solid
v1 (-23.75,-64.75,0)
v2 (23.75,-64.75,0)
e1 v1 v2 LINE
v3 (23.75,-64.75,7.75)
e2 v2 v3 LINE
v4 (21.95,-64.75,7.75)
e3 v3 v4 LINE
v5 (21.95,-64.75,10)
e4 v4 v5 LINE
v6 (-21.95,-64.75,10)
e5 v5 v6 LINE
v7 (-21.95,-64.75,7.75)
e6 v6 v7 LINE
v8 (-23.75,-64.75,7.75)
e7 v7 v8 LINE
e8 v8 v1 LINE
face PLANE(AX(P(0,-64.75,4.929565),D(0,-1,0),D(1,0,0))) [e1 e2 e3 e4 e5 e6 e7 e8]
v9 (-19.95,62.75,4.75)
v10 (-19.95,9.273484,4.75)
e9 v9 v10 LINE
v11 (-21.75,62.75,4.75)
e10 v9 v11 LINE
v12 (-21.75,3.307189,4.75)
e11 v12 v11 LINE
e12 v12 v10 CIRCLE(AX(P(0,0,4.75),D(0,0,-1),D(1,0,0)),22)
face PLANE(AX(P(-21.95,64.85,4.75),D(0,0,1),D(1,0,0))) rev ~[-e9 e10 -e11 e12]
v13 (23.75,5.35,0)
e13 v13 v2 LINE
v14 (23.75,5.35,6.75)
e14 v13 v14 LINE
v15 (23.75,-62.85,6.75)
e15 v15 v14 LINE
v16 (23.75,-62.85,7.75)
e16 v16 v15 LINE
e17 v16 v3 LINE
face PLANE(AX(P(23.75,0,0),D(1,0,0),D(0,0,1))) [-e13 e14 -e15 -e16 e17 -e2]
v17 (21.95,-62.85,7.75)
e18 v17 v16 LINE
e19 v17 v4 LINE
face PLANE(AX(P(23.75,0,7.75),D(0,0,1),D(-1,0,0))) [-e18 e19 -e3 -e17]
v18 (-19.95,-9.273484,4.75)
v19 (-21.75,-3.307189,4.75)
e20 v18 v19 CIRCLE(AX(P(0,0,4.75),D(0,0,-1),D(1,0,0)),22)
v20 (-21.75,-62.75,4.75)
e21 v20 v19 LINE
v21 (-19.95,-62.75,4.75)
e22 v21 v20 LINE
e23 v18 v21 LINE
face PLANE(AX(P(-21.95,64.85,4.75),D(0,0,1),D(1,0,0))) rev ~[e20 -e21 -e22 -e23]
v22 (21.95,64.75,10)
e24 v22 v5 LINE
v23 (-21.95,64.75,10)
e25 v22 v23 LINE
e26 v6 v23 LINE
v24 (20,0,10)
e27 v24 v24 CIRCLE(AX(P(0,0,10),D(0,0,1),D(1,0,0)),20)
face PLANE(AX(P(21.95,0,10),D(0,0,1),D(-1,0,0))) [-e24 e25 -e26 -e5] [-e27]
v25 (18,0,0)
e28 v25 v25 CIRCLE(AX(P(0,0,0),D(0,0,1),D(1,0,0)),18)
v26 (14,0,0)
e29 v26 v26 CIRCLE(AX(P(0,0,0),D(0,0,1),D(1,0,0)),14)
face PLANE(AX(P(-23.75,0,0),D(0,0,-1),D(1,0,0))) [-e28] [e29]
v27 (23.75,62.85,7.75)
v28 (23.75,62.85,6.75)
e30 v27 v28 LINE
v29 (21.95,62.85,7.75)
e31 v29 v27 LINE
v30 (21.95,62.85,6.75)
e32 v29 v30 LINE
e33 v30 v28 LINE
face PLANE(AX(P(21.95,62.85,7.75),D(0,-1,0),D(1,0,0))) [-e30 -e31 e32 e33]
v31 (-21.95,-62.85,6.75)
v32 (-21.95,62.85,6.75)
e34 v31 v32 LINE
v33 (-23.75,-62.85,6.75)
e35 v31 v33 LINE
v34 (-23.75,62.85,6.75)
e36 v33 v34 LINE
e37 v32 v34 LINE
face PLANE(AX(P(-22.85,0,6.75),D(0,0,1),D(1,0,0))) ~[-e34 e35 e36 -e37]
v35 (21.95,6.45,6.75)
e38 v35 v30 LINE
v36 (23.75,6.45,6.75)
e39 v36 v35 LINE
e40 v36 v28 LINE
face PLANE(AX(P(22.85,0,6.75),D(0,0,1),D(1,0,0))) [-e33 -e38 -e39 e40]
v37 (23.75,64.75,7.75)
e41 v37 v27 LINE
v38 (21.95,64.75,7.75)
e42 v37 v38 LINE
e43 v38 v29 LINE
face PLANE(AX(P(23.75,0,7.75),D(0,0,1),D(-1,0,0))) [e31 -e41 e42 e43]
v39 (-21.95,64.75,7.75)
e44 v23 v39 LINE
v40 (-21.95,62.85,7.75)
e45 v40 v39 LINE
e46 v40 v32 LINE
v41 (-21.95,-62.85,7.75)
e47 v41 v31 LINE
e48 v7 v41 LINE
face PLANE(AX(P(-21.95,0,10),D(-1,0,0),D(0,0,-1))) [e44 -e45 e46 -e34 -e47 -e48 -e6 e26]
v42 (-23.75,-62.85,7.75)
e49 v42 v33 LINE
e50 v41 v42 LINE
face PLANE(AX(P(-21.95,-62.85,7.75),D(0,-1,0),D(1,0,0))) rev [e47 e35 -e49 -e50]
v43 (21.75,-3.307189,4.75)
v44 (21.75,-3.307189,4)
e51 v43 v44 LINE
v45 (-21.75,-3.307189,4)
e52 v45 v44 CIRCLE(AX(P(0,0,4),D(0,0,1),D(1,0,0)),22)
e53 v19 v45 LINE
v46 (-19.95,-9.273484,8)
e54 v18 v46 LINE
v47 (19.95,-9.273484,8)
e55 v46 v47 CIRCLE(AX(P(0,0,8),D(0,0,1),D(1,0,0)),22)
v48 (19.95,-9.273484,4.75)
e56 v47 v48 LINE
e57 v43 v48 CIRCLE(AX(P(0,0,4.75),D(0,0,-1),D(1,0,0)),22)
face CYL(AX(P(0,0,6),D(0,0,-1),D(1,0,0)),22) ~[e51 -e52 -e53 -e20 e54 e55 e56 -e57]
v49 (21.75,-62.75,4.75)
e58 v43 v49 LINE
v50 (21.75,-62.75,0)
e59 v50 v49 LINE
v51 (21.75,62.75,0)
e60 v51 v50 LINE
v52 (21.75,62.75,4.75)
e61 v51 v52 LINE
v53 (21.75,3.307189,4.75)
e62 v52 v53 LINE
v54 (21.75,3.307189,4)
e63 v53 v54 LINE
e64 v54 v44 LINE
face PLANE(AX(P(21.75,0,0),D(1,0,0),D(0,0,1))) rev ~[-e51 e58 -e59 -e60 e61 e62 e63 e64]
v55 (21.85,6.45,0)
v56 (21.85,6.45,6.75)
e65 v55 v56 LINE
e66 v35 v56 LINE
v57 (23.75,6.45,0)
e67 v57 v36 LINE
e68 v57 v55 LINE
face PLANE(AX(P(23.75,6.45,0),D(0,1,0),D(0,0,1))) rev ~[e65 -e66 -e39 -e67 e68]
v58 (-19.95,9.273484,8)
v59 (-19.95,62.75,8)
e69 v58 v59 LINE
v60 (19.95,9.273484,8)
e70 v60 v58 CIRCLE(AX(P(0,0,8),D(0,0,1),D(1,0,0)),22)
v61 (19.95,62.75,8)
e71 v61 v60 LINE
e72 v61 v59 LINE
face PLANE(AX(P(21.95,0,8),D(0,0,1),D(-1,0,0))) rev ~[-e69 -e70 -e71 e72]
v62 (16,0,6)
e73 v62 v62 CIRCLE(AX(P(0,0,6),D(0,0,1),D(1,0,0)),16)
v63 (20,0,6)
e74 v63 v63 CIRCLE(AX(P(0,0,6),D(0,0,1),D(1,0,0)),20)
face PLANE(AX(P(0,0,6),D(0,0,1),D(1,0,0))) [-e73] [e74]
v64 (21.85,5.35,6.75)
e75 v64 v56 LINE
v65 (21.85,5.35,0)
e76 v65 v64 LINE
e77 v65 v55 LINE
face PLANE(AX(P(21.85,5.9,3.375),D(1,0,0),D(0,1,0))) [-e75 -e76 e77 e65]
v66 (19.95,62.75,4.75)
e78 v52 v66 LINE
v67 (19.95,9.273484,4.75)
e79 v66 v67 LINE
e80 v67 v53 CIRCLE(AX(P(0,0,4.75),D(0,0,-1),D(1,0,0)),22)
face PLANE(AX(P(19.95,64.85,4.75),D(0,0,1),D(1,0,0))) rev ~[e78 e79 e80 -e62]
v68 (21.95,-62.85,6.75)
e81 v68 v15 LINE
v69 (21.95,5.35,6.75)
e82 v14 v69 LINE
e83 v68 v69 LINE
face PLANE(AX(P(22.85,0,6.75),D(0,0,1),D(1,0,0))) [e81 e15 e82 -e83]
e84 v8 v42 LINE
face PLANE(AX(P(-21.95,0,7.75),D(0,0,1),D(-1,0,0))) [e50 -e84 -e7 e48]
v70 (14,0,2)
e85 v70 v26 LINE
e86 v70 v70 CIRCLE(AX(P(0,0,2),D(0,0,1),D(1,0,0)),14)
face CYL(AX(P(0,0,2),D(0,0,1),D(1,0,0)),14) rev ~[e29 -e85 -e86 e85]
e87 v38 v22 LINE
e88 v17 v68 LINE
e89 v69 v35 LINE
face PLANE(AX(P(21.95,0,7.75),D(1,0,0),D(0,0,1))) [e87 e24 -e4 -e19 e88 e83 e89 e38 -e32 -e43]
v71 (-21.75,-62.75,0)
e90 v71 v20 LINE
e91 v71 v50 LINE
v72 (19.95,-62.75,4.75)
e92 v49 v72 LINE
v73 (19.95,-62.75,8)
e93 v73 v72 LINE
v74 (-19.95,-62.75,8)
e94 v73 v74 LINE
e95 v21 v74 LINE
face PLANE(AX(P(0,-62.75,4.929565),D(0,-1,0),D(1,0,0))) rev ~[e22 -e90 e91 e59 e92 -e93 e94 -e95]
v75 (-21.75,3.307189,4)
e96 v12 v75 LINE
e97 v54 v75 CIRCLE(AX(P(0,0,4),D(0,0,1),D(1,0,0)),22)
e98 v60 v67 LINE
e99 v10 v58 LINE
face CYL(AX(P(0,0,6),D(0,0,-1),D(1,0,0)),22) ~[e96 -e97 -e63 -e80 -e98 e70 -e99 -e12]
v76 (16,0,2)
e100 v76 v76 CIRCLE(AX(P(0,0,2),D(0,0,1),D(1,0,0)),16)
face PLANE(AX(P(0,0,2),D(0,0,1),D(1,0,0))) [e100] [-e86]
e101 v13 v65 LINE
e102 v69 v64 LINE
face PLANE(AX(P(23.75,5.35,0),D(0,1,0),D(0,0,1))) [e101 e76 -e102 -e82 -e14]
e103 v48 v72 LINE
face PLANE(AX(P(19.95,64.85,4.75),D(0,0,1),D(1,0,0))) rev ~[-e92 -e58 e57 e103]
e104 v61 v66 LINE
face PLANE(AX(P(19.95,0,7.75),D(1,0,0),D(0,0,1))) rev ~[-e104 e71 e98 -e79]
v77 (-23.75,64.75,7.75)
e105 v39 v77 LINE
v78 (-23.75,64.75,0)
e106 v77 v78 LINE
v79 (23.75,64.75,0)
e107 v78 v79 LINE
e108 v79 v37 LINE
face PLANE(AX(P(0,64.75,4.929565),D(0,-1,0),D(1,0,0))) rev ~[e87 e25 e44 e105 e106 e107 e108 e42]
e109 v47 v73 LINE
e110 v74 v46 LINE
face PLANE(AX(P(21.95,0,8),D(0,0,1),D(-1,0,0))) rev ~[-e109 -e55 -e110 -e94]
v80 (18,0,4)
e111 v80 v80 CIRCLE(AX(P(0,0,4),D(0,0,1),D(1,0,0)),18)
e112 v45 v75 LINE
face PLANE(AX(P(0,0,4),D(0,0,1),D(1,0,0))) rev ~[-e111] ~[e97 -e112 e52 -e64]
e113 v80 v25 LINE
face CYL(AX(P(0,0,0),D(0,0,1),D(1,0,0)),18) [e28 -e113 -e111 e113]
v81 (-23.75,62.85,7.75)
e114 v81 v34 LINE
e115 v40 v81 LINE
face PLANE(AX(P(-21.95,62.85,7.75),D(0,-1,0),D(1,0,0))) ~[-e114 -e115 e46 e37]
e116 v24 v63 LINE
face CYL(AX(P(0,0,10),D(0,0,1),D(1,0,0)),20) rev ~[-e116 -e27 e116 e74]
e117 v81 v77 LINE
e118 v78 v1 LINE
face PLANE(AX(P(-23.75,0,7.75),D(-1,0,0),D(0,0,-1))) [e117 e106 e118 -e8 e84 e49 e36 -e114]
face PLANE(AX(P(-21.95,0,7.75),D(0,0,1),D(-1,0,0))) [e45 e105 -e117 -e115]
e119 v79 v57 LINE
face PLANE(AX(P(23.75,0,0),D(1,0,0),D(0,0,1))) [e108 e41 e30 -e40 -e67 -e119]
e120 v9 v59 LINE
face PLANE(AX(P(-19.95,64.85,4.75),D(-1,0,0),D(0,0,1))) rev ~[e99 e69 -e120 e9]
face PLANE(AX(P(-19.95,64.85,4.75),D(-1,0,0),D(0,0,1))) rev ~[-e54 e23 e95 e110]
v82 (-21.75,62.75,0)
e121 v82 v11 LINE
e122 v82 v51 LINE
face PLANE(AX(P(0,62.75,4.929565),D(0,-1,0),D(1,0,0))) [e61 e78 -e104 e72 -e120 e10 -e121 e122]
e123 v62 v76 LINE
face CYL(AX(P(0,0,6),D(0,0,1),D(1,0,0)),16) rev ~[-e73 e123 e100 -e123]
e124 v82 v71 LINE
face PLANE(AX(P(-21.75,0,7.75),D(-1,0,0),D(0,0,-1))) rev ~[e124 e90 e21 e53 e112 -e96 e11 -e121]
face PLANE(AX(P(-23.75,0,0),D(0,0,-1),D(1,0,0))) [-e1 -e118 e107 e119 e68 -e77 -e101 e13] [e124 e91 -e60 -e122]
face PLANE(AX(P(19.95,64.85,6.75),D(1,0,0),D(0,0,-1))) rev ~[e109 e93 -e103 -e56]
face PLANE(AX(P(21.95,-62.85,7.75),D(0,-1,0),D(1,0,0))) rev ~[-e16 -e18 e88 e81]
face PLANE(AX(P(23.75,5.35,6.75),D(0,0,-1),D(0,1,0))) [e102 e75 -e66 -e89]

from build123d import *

# Parameters (mm, degrees)
F1_DEPTH      = 64.75
F2_W          = 1.8
F2_H          = 125.7
F3_DEPTH      = 1
F4_R          = 20
F5_DEPTH      = 4
F6_R          = 16
F7_DEPTH      = 4
F8_R          = 14
F9_DEPTH      = 2.001
F10_T         = 2
F10_T3_DEPTH  = 5.9
F10_T5_DEPTH  = 5
F10_T7_DEPTH  = 5.8
F10_T9_DEPTH  = 129.7
F10_T11_DEPTH = 5.9
F10_T13_DEPTH = 5.8
F11_W         = 1.1
F11_H         = 6.75
F12_DEPTH     = 1.9


# Not quite as in the source:
# - a pattern or mirror of a feature is missing from the dataset's text; its kind, count and spacing are read off the source's solid
# - a shell that OpenCascade refuses in one call is made with other operations: the cavity is built on its own and cut out


with BuildPart() as f1:
    # F0 (on Front) → F1 (new body, symmetric)
    with BuildSketch(Plane.XZ):
        Polygon((-23.75, 7.75), (-23.75, 0), (23.75, 0), (23.75, 7.75), (21.95, 7.75), (21.95, 10), (-21.95, 10), (-21.95, 7.75), align=None)
    extrude(amount=F1_DEPTH, both=True)

    # F2 (on face) → F3 (cut)
    with BuildSketch(Plane.XY.offset(7.75)):
        with Locations((22.85, 0)):
            Rectangle(F2_W, F2_H)
    f3 = extrude(amount=-F3_DEPTH, mode=Mode.SUBTRACT)

    # F3_copies: F3 across plane
    add(f3.mirror(Plane(origin=(0, 0, 0), x_dir=(0, 0, -1), z_dir=(-1, 0, 0))), mode=Mode.SUBTRACT)

    # F4 (on face) → F5 (cut)
    with BuildSketch(Plane.XY.offset(10)):
        Circle(F4_R)
    extrude(amount=-F5_DEPTH, mode=Mode.SUBTRACT)

    # F6 (on face) → F7 (cut)
    with BuildSketch(Plane.XY.offset(6)):
        Circle(F6_R)
    extrude(amount=-F7_DEPTH, mode=Mode.SUBTRACT)

    # F8 (on face) → F9 (cut, through all)
    with BuildSketch(Plane.XY.offset(2)):
        Circle(F8_R)
    extrude(amount=-F9_DEPTH, mode=Mode.SUBTRACT)

    # F10: shell of thickness 2, made by hand


with BuildPart() as f10_core1:
    # F10_t2: copy of F1
    add(f1.part)

    # the walls: a layer under each face that stays
    f10_faces = [f10_core1.faces().sort_by_distance(p)[0] for p in [
        (-23.75, 0, 3.875),
        (-22.85, 63.8, 7.75),
        (-22.85, 62.85, 7.25),
        (-22.85, 0, 6.75),
        (-22.85, -62.85, 7.25),
        (-22.85, -63.8, 7.75),
        (0, -64.75, 5),
        (0, 64.75, 5),
        (-21.95, 0, 8.375),
        (23.75, 0, 3.875),
        (22.85, -63.8, 7.75),
        (21.95, 0, 8.375),
        (14.6333333333, 43.1666666667, 10),
        (-14, 0, 1),
        (22.85, 63.8, 7.75),
        (22.85, -62.85, 7.25),
        (22.85, 0, 6.75),
        (22.85, 62.85, 7.25),
        (-20, 0, 8),
        (-10.6666666667, -10.6666666667, 2),
        (-13.3333333333, -13.3333333333, 6),
        (-16, 0, 4),
    ]]
    thicken(f10_faces, amount=-F10_T, mode=Mode.SUBTRACT)

    # F10_s4 → F10_t3 (cut)
    with BuildSketch(Plane.XZ.offset(-66.75)):
        Polygon((-21.97, 7.77), (-21.95, 5.75), (-19.95, 5.75), (-19.95, 7.75), align=None)
        Polygon((21.97, 7.77), (19.95, 7.75), (19.95, 5.75), (21.95, 5.75), align=None)
    extrude(amount=F10_T3_DEPTH, mode=Mode.SUBTRACT)

    # F10_s6 → F10_t5 (cut)
    with BuildSketch(Plane.XY.offset(4.75)):
        Polygon((-21.97, 62.83), (-21.95, 64.85), (-19.95, 64.85), (-19.95, 62.85), align=None)
        Polygon((-21.97, -62.83), (-21.95, -64.85), (-19.95, -64.85), (-19.95, -62.85), align=None)
        Polygon((21.97, -62.83), (19.95, -62.85), (19.95, -64.85), (21.95, -64.85), align=None)
        Polygon((21.97, 62.83), (19.95, 62.85), (19.95, 64.85), (21.95, 64.85), align=None)
    extrude(amount=F10_T5_DEPTH, mode=Mode.SUBTRACT)

    # F10_s8 → F10_t7 (cut)
    with BuildSketch(Plane.YZ.offset(-25.75)):
        Polygon((62.83, 6.77), (64.85, 6.75), (64.85, 4.75), (62.85, 4.75), align=None)
        Polygon((-62.83, 6.77), (-62.85, 4.75), (-64.85, 4.75), (-64.85, 6.75), align=None)
    extrude(amount=F10_T7_DEPTH, mode=Mode.SUBTRACT)

    # F10_s10 → F10_t9 (cut)
    with BuildSketch(Plane.XZ.offset(-64.85)):
        Polygon((-21.97, 6.77), (-21.95, 4.75), (-19.95, 4.75), (-19.95, 6.75), align=None)
        Polygon((21.97, 6.77), (19.95, 6.75), (19.95, 4.75), (21.95, 4.75), align=None)
    extrude(amount=F10_T9_DEPTH, mode=Mode.SUBTRACT)

    # F10_s12 → F10_t11 (cut)
    with BuildSketch(Plane.XZ.offset(60.85)):
        Polygon((-21.97, 7.77), (-21.95, 5.75), (-19.95, 5.75), (-19.95, 7.75), align=None)
        Polygon((21.97, 7.77), (21.95, 5.75), (19.95, 5.75), (19.95, 7.75), align=None)
    extrude(amount=F10_T11_DEPTH, mode=Mode.SUBTRACT)

    # F10_s14 → F10_t13 (cut)
    with BuildSketch(Plane.YZ.offset(19.95)):
        Polygon((-62.83, 6.77), (-64.85, 6.75), (-64.85, 4.75), (-62.85, 4.75), align=None)
        Polygon((62.83, 6.77), (62.85, 4.75), (64.85, 4.75), (64.85, 6.75), align=None)
    extrude(amount=F10_T13_DEPTH, mode=Mode.SUBTRACT)

    # F10_s15 → F10_t16 (revolve, cut)
    with BuildSketch(Plane.XZ):
        Polygon((19.98, 6.02), (22, 6), (22, 4), (20, 4), align=None)
    revolve(axis=Axis((0, 0, 6), (0, 0, 1)), mode=Mode.SUBTRACT)

    # F10_s17 → F10_t18 (revolve, cut)
    with BuildSketch(Plane.XZ):
        Polygon((15.98, 2.02), (16, 0), (18, 0), (18, 2), align=None)
    revolve(axis=Axis((0, 0, 2), (0, 0, 1)), mode=Mode.SUBTRACT)


with BuildPart() as f1_1:
    add(f1.part)

    # what is left inside the walls is the cavity
    f10_cavity = [f10_core1.part.solids().sort_by_distance(p)[0] for p in [
        (0, 20.916667, 0.02),
    ]]
    add(f10_cavity, mode=Mode.SUBTRACT)

    # F11 (on face) → F12 (cut)
    with BuildSketch(Plane.YZ.offset(23.75)):
        with Locations((5.9, 3.375)):
            Rectangle(F11_W, F11_H)
    extrude(amount=-F12_DEPTH, mode=Mode.SUBTRACT)


solid = f1_1.part
